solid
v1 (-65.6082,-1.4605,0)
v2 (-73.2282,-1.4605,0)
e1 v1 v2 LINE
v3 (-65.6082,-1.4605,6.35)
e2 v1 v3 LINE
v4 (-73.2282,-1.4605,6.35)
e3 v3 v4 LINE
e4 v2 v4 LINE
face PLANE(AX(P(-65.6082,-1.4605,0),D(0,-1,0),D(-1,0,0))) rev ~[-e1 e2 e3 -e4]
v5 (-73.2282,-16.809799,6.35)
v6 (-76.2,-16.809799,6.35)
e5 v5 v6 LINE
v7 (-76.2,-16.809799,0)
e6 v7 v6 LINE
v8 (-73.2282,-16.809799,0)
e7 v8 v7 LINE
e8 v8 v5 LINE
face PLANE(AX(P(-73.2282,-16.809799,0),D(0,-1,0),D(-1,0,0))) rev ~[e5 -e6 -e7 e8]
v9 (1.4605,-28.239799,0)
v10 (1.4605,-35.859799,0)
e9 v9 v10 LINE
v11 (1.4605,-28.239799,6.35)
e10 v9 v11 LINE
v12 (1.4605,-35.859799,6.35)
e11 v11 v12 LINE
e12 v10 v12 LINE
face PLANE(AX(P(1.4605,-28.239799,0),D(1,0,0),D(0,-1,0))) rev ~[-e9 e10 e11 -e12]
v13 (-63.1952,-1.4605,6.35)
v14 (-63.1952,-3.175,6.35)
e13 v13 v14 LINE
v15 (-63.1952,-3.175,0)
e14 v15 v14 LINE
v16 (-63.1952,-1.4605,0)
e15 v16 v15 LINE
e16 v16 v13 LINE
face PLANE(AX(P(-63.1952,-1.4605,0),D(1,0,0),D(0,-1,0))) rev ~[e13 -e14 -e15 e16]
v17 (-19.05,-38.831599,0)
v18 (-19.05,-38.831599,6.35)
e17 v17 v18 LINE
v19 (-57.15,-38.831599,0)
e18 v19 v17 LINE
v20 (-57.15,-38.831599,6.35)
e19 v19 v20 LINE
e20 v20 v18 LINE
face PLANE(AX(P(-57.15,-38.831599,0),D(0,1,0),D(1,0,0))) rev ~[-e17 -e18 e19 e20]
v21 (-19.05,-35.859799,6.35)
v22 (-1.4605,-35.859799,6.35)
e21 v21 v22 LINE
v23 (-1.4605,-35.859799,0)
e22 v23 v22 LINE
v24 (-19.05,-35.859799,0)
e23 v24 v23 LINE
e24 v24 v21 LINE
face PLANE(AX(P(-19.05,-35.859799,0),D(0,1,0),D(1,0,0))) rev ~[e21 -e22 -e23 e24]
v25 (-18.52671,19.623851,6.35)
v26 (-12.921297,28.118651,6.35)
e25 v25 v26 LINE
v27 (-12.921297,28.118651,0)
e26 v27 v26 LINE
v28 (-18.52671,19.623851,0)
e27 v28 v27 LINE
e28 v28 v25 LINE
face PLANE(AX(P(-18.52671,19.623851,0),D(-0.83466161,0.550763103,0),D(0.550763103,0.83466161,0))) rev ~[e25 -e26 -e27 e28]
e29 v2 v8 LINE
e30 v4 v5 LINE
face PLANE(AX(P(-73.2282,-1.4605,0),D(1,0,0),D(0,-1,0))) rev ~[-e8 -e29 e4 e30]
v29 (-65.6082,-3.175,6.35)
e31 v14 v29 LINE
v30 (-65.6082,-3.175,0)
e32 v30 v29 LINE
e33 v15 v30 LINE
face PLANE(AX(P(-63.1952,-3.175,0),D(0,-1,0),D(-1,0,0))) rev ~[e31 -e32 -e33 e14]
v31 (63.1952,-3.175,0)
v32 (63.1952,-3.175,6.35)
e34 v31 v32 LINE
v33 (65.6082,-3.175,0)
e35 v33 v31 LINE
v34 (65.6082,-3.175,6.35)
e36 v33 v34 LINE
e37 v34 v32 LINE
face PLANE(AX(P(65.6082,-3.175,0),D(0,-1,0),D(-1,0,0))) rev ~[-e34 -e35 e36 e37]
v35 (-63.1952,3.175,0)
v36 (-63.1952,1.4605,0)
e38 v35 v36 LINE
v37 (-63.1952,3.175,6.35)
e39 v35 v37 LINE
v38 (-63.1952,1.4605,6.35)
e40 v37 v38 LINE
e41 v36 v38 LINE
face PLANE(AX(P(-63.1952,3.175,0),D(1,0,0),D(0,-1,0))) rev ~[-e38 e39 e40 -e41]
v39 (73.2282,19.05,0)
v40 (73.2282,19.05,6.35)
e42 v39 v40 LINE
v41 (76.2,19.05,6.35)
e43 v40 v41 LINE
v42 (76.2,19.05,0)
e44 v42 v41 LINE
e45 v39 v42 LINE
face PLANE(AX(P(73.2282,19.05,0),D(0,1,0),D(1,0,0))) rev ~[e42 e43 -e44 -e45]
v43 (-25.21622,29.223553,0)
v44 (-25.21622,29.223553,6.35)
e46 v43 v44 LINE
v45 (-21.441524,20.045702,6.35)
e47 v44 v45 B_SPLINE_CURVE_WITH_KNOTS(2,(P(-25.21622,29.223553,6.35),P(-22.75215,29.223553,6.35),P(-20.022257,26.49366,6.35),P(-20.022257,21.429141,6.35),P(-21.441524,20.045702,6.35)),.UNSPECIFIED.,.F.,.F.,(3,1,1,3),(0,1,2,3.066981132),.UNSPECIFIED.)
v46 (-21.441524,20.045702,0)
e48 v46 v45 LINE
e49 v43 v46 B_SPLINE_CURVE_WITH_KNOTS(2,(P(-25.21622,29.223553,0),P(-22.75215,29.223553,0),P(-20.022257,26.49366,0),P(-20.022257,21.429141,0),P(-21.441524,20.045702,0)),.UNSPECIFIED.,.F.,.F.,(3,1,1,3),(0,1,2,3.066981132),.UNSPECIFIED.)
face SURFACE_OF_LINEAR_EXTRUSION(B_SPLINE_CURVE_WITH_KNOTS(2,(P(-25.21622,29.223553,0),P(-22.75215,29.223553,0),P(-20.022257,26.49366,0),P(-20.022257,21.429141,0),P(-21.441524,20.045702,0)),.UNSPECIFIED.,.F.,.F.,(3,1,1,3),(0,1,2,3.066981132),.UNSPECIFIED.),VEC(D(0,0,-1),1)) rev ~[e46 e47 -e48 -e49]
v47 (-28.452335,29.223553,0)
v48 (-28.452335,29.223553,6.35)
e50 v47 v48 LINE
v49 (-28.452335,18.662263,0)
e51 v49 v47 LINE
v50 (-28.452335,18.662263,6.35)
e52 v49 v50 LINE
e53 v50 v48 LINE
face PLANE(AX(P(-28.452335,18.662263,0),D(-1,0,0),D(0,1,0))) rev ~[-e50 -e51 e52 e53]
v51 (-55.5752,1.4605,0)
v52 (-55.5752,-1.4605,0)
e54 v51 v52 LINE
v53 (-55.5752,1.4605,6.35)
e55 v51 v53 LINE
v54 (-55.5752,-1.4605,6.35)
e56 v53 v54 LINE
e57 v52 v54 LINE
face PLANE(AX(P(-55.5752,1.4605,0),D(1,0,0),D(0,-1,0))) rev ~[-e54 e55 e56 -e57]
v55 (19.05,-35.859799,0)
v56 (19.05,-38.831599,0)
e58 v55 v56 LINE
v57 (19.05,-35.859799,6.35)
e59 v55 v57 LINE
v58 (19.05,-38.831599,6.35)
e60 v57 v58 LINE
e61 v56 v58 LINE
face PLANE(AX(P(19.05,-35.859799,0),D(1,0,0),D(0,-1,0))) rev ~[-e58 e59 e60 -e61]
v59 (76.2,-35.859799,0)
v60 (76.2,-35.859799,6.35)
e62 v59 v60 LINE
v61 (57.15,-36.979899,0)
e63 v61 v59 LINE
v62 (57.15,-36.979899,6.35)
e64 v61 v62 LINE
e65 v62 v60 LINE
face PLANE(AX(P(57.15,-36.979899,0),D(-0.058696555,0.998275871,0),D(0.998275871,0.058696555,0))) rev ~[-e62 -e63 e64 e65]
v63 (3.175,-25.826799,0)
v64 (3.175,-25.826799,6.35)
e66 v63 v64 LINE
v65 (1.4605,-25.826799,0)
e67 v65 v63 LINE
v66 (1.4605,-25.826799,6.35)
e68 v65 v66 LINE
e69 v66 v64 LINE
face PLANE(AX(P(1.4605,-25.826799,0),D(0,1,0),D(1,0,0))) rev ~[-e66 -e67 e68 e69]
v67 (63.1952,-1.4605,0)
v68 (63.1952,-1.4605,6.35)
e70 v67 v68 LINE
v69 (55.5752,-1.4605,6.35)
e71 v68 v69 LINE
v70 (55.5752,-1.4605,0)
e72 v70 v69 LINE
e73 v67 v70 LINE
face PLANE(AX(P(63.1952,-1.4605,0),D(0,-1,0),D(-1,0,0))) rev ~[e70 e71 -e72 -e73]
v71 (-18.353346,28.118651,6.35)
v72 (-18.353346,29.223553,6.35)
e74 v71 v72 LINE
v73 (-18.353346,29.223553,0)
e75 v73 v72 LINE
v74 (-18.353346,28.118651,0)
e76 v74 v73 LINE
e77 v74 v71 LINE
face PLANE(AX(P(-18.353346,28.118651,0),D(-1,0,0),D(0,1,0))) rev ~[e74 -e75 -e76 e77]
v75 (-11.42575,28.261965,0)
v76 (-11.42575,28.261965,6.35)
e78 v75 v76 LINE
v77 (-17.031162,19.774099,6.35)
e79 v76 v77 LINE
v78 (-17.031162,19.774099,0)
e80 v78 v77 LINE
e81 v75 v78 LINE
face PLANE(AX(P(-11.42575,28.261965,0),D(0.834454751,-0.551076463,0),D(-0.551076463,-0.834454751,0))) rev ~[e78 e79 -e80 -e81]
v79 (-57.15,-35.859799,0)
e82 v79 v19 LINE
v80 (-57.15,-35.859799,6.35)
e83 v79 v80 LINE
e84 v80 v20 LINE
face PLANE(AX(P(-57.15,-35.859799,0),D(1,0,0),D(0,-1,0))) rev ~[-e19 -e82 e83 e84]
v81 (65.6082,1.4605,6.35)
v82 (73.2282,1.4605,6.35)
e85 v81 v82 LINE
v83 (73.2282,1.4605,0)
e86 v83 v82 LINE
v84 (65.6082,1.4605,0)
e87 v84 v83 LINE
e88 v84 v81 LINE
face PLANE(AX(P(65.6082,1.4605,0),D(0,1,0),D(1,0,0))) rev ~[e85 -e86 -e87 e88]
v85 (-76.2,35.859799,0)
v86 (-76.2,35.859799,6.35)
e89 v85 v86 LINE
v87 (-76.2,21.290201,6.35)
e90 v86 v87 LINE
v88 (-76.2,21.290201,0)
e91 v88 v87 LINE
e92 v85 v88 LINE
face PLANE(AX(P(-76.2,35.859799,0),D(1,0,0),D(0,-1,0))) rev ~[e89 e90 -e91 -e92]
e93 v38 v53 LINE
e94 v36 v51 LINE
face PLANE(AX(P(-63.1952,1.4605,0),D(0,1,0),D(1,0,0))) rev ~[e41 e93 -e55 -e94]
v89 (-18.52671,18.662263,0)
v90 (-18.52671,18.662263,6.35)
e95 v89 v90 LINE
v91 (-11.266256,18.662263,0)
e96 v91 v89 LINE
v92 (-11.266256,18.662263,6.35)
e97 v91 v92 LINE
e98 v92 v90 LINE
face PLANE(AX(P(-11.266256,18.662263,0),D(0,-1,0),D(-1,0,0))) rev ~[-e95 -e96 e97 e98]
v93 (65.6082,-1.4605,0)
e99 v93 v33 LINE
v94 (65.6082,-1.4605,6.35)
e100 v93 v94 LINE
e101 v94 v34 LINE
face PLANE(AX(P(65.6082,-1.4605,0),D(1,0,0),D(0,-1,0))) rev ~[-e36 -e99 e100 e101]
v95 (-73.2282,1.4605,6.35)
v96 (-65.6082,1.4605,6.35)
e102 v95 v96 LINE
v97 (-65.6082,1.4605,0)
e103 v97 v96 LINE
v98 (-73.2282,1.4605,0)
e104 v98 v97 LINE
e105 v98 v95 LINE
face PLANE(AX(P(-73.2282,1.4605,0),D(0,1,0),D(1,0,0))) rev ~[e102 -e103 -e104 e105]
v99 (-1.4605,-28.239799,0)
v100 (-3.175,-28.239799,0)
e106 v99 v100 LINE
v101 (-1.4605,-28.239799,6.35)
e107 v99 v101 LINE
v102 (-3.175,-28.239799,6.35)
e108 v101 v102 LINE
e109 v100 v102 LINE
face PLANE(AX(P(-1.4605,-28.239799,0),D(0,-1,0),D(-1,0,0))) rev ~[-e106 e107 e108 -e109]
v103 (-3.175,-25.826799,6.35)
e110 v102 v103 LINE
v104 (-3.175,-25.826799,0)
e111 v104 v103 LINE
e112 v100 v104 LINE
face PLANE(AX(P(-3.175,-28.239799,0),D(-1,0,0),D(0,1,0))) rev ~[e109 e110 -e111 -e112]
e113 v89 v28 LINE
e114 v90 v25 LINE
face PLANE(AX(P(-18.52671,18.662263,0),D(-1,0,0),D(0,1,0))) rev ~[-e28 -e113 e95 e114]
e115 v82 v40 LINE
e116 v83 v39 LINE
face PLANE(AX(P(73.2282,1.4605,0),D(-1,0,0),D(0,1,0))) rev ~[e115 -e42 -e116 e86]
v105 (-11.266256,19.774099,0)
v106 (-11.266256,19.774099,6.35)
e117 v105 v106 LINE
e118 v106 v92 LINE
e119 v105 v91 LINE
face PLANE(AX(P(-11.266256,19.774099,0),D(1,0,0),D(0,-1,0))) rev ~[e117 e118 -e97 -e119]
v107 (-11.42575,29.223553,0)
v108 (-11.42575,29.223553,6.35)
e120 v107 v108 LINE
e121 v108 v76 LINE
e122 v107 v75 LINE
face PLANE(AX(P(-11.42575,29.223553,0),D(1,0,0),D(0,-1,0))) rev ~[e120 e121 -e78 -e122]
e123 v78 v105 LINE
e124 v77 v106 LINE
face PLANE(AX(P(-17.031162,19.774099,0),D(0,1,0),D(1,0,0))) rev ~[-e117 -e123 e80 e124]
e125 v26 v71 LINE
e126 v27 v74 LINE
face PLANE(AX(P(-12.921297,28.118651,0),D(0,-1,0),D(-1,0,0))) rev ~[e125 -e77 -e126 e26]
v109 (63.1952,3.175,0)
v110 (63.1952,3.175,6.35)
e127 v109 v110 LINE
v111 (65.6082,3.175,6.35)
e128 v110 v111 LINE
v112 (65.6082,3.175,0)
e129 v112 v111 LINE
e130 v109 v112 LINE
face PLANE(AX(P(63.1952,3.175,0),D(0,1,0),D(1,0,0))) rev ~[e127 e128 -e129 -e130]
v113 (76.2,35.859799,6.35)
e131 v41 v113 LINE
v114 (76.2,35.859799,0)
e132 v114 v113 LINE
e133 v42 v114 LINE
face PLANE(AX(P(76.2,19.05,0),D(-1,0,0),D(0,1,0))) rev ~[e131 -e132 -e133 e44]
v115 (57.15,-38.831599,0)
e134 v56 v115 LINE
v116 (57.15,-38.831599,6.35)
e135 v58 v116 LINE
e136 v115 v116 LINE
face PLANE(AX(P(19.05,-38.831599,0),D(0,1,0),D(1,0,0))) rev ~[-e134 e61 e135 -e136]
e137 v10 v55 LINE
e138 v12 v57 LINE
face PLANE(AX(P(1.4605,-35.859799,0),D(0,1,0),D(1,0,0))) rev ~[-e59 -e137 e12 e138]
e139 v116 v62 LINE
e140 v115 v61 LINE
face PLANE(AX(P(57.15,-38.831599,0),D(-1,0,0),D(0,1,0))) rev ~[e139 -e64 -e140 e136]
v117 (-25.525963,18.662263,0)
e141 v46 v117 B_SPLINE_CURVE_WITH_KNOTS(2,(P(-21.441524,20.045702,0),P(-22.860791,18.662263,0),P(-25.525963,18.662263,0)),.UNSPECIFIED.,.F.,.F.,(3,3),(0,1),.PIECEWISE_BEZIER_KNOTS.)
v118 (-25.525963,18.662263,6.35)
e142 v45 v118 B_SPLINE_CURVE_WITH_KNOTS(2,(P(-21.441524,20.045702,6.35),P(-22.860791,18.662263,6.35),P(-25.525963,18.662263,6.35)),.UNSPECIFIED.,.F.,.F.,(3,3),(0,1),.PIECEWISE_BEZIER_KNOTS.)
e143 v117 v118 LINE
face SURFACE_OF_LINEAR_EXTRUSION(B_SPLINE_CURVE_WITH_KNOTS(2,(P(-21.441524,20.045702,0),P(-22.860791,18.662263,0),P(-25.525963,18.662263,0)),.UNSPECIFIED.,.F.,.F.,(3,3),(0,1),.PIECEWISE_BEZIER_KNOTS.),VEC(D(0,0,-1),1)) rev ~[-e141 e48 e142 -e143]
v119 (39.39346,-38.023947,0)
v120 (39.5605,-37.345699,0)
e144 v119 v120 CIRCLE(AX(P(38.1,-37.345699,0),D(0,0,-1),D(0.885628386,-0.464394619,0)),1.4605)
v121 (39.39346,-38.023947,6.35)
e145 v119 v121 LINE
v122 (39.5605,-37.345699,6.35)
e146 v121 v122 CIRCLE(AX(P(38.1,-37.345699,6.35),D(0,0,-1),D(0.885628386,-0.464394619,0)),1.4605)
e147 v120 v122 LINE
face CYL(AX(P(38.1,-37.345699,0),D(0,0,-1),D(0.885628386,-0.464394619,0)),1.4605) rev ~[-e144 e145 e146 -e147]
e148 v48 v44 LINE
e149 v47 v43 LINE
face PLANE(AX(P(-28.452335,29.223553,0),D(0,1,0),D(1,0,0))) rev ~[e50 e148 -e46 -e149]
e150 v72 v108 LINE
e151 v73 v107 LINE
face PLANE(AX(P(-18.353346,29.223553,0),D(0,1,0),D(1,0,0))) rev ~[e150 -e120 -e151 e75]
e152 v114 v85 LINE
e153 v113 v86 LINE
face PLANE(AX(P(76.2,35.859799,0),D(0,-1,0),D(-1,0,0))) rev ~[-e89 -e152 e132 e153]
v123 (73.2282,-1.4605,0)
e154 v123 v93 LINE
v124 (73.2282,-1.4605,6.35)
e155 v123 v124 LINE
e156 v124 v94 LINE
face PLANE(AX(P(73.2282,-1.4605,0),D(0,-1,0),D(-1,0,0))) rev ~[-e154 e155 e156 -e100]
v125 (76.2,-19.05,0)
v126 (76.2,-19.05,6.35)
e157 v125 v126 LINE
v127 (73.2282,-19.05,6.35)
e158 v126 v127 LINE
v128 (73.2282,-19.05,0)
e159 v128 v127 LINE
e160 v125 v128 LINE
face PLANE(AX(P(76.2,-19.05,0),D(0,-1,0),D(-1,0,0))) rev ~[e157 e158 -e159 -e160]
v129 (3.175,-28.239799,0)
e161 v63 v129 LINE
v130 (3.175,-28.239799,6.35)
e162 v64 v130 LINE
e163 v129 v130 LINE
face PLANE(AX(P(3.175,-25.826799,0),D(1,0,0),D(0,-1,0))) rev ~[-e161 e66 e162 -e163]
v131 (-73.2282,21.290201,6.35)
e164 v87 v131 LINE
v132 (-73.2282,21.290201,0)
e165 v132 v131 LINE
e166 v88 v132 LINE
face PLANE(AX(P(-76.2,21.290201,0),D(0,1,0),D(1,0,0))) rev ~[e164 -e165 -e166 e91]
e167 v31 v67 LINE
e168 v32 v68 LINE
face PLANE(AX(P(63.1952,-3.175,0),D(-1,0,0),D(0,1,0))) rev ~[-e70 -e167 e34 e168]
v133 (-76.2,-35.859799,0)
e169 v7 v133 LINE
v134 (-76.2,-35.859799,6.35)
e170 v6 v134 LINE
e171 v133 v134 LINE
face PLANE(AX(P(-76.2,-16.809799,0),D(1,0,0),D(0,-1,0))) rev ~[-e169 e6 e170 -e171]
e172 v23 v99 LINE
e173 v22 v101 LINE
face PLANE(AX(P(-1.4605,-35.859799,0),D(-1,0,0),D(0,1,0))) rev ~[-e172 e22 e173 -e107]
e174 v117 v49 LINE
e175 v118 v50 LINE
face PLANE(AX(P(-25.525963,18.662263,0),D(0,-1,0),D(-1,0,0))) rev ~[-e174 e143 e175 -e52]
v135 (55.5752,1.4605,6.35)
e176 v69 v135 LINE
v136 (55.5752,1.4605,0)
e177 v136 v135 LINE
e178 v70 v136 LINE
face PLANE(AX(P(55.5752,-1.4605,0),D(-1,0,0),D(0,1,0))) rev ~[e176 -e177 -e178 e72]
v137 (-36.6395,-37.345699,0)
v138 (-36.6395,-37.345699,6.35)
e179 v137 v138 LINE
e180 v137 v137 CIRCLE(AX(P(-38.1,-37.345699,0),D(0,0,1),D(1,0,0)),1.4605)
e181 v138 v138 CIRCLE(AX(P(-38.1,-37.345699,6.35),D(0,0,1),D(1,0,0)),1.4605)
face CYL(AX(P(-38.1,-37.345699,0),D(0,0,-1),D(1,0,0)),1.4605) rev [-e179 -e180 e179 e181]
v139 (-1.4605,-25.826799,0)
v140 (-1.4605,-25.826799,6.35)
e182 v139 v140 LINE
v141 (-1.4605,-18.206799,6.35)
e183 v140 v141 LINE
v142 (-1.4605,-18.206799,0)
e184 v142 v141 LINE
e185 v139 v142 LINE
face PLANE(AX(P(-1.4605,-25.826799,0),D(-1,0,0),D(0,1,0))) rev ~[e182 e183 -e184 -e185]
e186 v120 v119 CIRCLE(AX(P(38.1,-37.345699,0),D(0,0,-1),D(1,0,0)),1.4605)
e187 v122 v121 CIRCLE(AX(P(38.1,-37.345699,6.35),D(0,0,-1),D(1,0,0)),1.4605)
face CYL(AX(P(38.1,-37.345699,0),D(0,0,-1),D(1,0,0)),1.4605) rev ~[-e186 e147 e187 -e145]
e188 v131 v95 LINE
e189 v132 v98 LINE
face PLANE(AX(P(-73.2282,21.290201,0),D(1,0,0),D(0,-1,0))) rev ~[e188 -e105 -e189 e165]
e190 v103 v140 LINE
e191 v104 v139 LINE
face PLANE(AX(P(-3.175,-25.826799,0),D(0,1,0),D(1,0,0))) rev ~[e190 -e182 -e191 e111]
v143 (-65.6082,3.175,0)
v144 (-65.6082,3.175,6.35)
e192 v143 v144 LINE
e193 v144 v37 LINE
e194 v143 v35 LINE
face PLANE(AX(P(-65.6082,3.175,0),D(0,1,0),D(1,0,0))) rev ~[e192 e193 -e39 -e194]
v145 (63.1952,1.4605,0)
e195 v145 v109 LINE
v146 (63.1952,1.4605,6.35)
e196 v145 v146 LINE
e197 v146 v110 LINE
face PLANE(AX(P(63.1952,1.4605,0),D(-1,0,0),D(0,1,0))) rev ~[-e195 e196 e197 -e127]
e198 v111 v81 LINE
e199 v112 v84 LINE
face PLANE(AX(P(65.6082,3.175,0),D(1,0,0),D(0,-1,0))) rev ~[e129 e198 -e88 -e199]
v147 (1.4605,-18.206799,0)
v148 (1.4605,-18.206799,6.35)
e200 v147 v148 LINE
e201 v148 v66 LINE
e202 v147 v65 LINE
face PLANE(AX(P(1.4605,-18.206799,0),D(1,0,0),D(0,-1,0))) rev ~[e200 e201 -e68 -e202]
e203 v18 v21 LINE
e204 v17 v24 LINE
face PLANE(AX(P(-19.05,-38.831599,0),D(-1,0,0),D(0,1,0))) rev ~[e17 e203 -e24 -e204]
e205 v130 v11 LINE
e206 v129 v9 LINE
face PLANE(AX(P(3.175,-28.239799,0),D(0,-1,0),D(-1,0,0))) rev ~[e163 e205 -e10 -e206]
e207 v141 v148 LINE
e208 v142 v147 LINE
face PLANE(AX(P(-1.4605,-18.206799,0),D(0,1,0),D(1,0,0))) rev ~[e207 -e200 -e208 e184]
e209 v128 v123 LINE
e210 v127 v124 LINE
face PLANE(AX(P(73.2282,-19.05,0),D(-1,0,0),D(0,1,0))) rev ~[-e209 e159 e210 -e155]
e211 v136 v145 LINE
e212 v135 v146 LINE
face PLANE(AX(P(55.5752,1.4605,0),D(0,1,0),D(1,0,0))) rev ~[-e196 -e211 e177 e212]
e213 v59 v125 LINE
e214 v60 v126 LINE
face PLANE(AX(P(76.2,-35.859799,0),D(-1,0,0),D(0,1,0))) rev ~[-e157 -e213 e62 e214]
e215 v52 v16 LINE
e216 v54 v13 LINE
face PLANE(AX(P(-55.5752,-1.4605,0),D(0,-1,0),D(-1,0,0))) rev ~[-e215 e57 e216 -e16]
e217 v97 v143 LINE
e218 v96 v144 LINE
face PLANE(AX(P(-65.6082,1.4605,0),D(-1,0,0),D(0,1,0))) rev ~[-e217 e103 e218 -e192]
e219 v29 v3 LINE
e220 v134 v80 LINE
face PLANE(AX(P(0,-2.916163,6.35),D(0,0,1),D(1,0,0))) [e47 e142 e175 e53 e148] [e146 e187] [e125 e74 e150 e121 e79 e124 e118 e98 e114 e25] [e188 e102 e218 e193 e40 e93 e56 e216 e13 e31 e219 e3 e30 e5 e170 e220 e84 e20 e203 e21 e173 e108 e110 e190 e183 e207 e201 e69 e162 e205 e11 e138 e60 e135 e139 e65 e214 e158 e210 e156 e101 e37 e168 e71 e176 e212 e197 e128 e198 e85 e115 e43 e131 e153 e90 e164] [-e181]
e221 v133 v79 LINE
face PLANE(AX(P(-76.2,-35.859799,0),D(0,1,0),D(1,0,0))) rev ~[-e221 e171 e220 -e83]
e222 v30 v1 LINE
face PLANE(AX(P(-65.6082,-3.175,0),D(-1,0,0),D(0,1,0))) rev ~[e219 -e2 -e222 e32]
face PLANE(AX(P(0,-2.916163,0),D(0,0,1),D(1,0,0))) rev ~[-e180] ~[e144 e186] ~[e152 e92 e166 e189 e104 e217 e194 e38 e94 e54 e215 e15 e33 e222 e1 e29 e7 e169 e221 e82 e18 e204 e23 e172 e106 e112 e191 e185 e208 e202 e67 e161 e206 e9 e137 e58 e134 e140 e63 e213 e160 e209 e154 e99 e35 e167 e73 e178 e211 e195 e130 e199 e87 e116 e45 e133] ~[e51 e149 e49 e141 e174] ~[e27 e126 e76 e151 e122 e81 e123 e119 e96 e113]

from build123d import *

# Parameters (mm, degrees)
F0_R     = 1.4605
F1_DEPTH = 6.35


# Not quite as in the source:
# - a feature names something its author has since deleted; it is built from what else it names


with BuildPart() as f1:
    # F0 (on Top) → F1 (new body)
    with BuildSketch(Plane.XY):
        Polygon((76.2, 19.05), (76.2, 35.8597988734), (-76.2, 35.8597988734), (-76.2, 21.2902011266), (-73.2282, 21.2902011266), (-73.2282, 1.4605), (-65.6082, 1.4605), (-65.6082, 3.175), (-63.1952, 3.175), (-63.1952, 1.4605), (-55.5752, 1.4605), (-55.5752, -1.4605), (-63.1952, -1.4605), (-63.1952, -3.175), (-65.6082, -3.175), (-65.6082, -1.4605), (-73.2282, -1.4605), (-73.2282, -16.8097988734), (-76.2, -16.8097988734), (-76.2, -35.8597988734), (-57.15, -35.8597988734), (-57.15, -38.8315988734), (-19.05, -38.8315988734), (-19.05, -35.8597988734), (-1.4605, -35.8597988734), (-1.4605, -28.2397988734), (-3.175, -28.2397988734), (-3.175, -25.8267988734), (-1.4605, -25.8267988734), (-1.4605, -18.2067988734), (1.4605, -18.2067988734), (1.4605, -25.8267988734), (3.175, -25.8267988734), (3.175, -28.2397988734), (1.4605, -28.2397988734), (1.4605, -35.8597988734), (19.05, -35.8597988734), (19.05, -38.8315988734), (57.15, -38.8315988734), (57.15, -36.9798994367), (57.15, -35.8597988734), (76.2, -35.8597988734), (76.2, -19.05), (73.2282, -19.05), (73.2282, -1.4605), (65.6082, -1.4605), (65.6082, -3.175), (63.1952, -3.175), (63.1952, -1.4605), (55.5752, -1.4605), (55.5752, 1.4605), (63.1952, 1.4605), (63.1952, 3.175), (65.6082, 3.175), (65.6082, 1.4605), (73.2282, 1.4605), (73.2282, 19.05), align=None)
        with Locations((-38.1, -37.3456988734)):
            Circle(F0_R, mode=Mode.SUBTRACT)
        with BuildLine():
            ThreePointArc((39.5605, -37.3456988734), (39.5181253393, -37.6949563314), (39.3934602575, -38.0239472145))
            ThreePointArc((39.3934602575, -38.0239472145), (36.6818746607, -36.9964414154), (39.5605, -37.3456988734))
        make_face(mode=Mode.SUBTRACT)
        with BuildLine():
            add(Edge.make_bspline(
                [(-21.3872035351, 27.8586064071), (-20.0222567073, 26.4936595793), (-20.0222567073, 24.0434586691)],
                knots=[0, 0, 0, 1, 1, 1], degree=2))
            add(Edge.make_bspline(
                [(-20.0222567073, 24.0434586691), (-20.0222567073, 21.4291405282), (-21.441524027, 20.0457016181)],
                knots=[0, 0, 0, 1, 1, 1], degree=2))
            add(Edge.make_bspline(
                [(-21.441524027, 20.0457016181), (-22.8607913466, 18.6622627079), (-25.525962714, 18.6622627079)],
                knots=[0, 0, 0, 1, 1, 1], degree=2))
            Line((-25.525962714, 18.6622627079), (-28.4523347444, 18.6622627079))
            Line((-28.4523347444, 18.6622627079), (-28.4523347444, 29.2235532349))
            Line((-28.4523347444, 29.2235532349), (-25.2162203348, 29.2235532349))
            add(Edge.make_bspline(
                [(-25.2162203348, 29.2235532349), (-22.7521503629, 29.2235532349), (-21.3872035351, 27.8586064071)],
                knots=[0, 0, 0, 1, 1, 1], degree=2))
        make_face(mode=Mode.SUBTRACT)
        Polygon((-11.2662557189, 19.7740991587), (-11.2662557189, 18.6622627079), (-18.526709548, 18.6622627079), (-18.526709548, 19.6238509897), (-12.9212970884, 28.118651315), (-18.353346276, 28.118651315), (-18.353346276, 29.2235532349), (-11.4257499291, 29.2235532349), (-11.4257499291, 28.2619649531), (-17.0311623887, 19.7740991587), align=None, mode=Mode.SUBTRACT)
        Polygon((57.15, -36.9798994367), (76.2, -35.8597988734), (57.15, -35.8597988734), align=None)
    extrude(amount=F1_DEPTH)


solid = f1.part
